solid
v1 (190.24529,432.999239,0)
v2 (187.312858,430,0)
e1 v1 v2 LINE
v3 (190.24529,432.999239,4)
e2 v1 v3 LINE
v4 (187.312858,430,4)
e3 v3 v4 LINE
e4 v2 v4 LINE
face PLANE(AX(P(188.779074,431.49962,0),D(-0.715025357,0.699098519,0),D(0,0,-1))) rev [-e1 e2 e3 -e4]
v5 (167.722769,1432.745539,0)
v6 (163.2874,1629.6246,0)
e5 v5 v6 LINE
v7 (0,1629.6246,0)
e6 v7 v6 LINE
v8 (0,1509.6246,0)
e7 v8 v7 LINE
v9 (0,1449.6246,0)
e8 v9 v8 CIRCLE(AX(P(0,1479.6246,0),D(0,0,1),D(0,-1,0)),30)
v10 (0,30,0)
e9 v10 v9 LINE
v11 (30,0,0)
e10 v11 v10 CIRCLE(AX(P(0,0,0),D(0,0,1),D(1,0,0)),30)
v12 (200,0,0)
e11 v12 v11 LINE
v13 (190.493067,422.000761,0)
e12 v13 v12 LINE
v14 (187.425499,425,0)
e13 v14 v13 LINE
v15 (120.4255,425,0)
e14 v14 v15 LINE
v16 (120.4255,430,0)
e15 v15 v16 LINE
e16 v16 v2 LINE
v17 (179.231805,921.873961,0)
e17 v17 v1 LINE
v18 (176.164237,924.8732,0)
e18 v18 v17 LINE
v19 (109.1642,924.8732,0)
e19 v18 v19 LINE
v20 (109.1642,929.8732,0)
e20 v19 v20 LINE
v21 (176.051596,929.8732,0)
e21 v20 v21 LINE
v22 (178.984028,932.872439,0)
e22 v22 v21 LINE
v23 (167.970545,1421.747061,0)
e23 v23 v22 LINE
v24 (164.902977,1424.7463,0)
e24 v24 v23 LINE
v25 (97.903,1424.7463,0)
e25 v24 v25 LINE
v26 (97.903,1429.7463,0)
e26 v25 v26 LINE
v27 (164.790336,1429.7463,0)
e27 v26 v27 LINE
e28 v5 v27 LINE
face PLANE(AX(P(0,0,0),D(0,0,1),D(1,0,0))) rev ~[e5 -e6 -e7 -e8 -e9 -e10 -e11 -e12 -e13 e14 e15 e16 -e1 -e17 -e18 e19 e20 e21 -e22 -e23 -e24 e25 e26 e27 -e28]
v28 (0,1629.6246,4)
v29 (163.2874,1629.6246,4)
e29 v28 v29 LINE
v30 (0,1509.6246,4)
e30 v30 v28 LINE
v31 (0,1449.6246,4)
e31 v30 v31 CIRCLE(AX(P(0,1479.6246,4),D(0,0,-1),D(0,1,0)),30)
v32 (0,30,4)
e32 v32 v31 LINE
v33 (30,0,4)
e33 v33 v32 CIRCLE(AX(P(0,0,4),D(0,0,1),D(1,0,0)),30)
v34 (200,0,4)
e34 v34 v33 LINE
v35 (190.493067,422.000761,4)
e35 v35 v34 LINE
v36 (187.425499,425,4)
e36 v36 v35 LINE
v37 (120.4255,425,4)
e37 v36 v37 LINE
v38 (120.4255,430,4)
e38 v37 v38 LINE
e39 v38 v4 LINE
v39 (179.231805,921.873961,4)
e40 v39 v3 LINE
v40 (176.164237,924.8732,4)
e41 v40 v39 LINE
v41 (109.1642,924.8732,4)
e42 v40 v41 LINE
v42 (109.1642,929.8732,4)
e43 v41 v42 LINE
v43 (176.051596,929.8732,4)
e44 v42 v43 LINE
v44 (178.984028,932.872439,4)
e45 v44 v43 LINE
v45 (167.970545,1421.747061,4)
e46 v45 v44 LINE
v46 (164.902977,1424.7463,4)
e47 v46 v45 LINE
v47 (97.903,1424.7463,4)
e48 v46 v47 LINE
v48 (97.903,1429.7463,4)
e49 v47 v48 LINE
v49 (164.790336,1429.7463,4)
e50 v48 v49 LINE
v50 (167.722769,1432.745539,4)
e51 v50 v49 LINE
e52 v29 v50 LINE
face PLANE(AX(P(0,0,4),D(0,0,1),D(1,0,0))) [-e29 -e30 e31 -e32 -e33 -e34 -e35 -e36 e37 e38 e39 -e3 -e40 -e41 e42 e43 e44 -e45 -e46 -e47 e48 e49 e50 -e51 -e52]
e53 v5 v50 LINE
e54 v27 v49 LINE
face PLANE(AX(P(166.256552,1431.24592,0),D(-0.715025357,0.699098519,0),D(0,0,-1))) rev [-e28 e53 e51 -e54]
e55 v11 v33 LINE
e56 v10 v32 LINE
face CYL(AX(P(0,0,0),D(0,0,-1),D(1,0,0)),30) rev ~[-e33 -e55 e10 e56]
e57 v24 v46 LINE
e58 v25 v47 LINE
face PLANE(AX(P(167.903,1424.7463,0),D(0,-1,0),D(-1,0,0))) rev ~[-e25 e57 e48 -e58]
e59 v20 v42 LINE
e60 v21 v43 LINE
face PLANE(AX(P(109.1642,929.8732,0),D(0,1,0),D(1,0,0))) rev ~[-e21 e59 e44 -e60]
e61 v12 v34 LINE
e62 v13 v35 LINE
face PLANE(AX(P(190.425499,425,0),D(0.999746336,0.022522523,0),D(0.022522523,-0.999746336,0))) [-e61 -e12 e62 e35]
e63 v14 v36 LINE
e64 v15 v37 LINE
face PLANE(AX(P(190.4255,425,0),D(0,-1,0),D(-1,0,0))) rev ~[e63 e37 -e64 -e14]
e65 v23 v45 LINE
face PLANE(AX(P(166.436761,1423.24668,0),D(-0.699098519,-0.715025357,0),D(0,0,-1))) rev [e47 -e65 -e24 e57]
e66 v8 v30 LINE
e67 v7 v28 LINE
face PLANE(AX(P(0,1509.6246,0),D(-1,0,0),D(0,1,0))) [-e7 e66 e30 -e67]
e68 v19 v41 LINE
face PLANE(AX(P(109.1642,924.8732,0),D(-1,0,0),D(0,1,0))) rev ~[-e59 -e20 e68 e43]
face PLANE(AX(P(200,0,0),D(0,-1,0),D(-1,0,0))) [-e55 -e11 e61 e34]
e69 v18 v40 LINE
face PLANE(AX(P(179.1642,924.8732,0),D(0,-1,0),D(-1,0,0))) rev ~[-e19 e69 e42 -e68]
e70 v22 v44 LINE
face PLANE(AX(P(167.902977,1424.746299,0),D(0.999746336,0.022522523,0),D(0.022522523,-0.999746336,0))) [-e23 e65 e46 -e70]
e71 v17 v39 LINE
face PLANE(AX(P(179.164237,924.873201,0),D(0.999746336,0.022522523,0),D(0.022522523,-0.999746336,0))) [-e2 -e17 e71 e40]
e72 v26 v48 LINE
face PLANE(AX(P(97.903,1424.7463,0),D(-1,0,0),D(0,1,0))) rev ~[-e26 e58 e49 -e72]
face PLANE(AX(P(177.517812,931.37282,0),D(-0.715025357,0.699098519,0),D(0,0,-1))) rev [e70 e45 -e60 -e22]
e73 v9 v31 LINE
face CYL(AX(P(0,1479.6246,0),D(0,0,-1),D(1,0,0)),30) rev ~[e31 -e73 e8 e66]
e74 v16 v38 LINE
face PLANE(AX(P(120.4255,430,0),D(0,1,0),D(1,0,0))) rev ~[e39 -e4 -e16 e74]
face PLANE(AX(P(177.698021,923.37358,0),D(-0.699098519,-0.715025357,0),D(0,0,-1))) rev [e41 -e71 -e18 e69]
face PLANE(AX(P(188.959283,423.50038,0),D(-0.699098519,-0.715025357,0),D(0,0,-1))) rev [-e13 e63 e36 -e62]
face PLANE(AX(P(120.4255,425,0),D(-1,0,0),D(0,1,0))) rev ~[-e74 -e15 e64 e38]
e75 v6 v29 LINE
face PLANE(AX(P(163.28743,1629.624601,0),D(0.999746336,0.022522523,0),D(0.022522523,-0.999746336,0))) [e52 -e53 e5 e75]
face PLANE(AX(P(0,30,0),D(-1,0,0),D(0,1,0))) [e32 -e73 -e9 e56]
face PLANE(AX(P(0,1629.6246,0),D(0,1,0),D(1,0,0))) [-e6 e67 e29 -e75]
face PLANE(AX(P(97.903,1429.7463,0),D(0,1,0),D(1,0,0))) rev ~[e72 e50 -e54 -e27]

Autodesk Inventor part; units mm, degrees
ref_plane "YZ Plane" through (0, 0, 0) normal (1, 0, 0) x (0, 1, 0)
ref_plane "XZ Plane" through (0, 0, 0) normal (0, 1, 0) x (-1, 0, 0)
ref_plane "XY Plane" through (0, 0, 0) normal (0, 0, 1) x (1, 0, 0)
sketch "Sketch1" plane through (0, 0, 0) normal (0, 0, 1) x (1, 0, 0)
  line L0 (0, 0) -> (0, 4438.8737)
  line L1 (0, 4438.8737) -> (100, 4438.8737)
  line L2 (100, 4438.8737) -> (200, 0)
  line L3 (200, 0) -> (0, 0)
  circle A0 centre (0, 0) radius 30
  line L4 (0, 1479.6246) -> (166.6667, 1479.6246)
  line L5 (0, 2959.2492) -> (133.3333, 2959.2492)
  circle A1 centre (0, 1479.6246) radius 30
  circle A2 centre (0, 2959.2492) radius 30
  line L6 (190.4255, 425) -> (120.4255, 425)
  line L7 (120.4255, 425) -> (120.4255, 430)
  line L8 (120.4255, 430) -> (190.4255, 430)
  line L9 (190.4255, 430) -> (190.4255, 425)
  line L10 (109.1642, 929.8732) -> (179.1642, 929.8732)
  line L11 (179.1642, 924.8732) -> (109.1642, 924.8732)
  line L12 (109.1642, 924.8732) -> (109.1642, 929.8732)
  line L13 (179.1642, 929.8732) -> (179.1642, 924.8732)
  line L14 (97.903, 1429.7463) -> (167.903, 1429.7463)
  line L15 (167.903, 1424.7463) -> (97.903, 1424.7463)
  line L16 (97.903, 1424.7463) -> (97.903, 1429.7463)
  line L17 (167.903, 1429.7463) -> (167.903, 1424.7463)
  line L18 (86.6417, 1929.6195) -> (156.6417, 1929.6195)
  line L19 (156.6417, 1924.6195) -> (86.6417, 1924.6195)
  line L20 (86.6417, 1924.6195) -> (86.6417, 1929.6195)
  line L21 (156.6417, 1929.6195) -> (156.6417, 1924.6195)
  line L22 (75.3805, 2429.4927) -> (145.3805, 2429.4927)
  line L23 (145.3805, 2424.4927) -> (75.3805, 2424.4927)
  line L24 (75.3805, 2424.4927) -> (75.3805, 2429.4927)
  line L25 (145.3805, 2429.4927) -> (145.3805, 2424.4927)
  line L26 (64.1192, 2929.3658) -> (134.1192, 2929.3658)
  line L27 (134.1192, 2924.3658) -> (64.1192, 2924.3658)
  line L28 (64.1192, 2924.3658) -> (64.1192, 2929.3658)
  line L29 (134.1192, 2929.3658) -> (134.1192, 2924.3658)
  line L30 (52.8579, 3429.239) -> (122.8579, 3429.239)
  line L31 (122.8579, 3424.239) -> (52.8579, 3424.239)
  line L32 (52.8579, 3424.239) -> (52.8579, 3429.239)
  line L33 (122.8579, 3429.239) -> (122.8579, 3424.239)
  line L34 (41.5967, 3929.1122) -> (111.5967, 3929.1122)
  line L35 (111.5967, 3924.1122) -> (41.5967, 3924.1122)
  line L36 (41.5967, 3924.1122) -> (41.5967, 3929.1122)
  line L37 (111.5967, 3929.1122) -> (111.5967, 3924.1122)
  line L38 (0, 1629.6246) -> (163.2874, 1629.6246)
  line L39 (0, 3039.2492) -> (131.5311, 3039.2492)
  point P0 (30, 2959.2492)
  point P1 (0, 2929.2492)
  point P2 (0, 1509.6246)
  point P3 (0, 1449.6246)
  point P4 (0, 30)
  point P5 (30, 0)
  point P6 (190.3129, 430)
  point P7 (179.0516, 929.8732)
  point P8 (167.7903, 1429.7463)
  point P9 (30, 1479.6246)
  dimension "d65" = 100
  dimension "d67" = 200
  dimension "d68" = 60
  dimension "d69" = 1480
  dimension "d70" = 1480
  dimension "d71" = 1480
  dimension "d72" = 5
  dimension "d73" = 70
  dimension "d74" = 430
  dimension "d77" = 500
  dimension "d82" = 80
  dimension "d83" = 150
extrude "Plate3" add sketch "Sketch1" along normal blind 4 contours L38 L2 L4 A1 L0 | L4 L2 L14 L16 L15 L10 L12 L11 L8 L7 L6 L3 A0 L0 A1
chamfer "Corner Chamfer2" distance 3 angle 45 6 edges at (190.3129, 430, 2) (190.4255, 425, 2) (179.1642, 924.8732, 2) (179.0516, 929.8732, 2) (167.903, 1424.7463, 2) (167.7903, 1429.7463, 2)
equation "\"BendRadius\" = Thickness"
equation "\"BendReliefWidth\" = Thickness"
equation "\"BendReliefDepth\" = 0.5 * Thickness"
equation "\"CornerReliefSize\" = 4 * Thickness"
equation "\"MinimumRemnant\" = 2 * Thickness"
equation "\"TransitionRadius\" = BendRadius"
equation "\"JacobiRadiusSize\" = BendRadius"
equation "\"GapSize\" = Thickness"
equation "\"Thickness\" = 4"
properties part number "0411 GBK Center main rib" material "Steel"
